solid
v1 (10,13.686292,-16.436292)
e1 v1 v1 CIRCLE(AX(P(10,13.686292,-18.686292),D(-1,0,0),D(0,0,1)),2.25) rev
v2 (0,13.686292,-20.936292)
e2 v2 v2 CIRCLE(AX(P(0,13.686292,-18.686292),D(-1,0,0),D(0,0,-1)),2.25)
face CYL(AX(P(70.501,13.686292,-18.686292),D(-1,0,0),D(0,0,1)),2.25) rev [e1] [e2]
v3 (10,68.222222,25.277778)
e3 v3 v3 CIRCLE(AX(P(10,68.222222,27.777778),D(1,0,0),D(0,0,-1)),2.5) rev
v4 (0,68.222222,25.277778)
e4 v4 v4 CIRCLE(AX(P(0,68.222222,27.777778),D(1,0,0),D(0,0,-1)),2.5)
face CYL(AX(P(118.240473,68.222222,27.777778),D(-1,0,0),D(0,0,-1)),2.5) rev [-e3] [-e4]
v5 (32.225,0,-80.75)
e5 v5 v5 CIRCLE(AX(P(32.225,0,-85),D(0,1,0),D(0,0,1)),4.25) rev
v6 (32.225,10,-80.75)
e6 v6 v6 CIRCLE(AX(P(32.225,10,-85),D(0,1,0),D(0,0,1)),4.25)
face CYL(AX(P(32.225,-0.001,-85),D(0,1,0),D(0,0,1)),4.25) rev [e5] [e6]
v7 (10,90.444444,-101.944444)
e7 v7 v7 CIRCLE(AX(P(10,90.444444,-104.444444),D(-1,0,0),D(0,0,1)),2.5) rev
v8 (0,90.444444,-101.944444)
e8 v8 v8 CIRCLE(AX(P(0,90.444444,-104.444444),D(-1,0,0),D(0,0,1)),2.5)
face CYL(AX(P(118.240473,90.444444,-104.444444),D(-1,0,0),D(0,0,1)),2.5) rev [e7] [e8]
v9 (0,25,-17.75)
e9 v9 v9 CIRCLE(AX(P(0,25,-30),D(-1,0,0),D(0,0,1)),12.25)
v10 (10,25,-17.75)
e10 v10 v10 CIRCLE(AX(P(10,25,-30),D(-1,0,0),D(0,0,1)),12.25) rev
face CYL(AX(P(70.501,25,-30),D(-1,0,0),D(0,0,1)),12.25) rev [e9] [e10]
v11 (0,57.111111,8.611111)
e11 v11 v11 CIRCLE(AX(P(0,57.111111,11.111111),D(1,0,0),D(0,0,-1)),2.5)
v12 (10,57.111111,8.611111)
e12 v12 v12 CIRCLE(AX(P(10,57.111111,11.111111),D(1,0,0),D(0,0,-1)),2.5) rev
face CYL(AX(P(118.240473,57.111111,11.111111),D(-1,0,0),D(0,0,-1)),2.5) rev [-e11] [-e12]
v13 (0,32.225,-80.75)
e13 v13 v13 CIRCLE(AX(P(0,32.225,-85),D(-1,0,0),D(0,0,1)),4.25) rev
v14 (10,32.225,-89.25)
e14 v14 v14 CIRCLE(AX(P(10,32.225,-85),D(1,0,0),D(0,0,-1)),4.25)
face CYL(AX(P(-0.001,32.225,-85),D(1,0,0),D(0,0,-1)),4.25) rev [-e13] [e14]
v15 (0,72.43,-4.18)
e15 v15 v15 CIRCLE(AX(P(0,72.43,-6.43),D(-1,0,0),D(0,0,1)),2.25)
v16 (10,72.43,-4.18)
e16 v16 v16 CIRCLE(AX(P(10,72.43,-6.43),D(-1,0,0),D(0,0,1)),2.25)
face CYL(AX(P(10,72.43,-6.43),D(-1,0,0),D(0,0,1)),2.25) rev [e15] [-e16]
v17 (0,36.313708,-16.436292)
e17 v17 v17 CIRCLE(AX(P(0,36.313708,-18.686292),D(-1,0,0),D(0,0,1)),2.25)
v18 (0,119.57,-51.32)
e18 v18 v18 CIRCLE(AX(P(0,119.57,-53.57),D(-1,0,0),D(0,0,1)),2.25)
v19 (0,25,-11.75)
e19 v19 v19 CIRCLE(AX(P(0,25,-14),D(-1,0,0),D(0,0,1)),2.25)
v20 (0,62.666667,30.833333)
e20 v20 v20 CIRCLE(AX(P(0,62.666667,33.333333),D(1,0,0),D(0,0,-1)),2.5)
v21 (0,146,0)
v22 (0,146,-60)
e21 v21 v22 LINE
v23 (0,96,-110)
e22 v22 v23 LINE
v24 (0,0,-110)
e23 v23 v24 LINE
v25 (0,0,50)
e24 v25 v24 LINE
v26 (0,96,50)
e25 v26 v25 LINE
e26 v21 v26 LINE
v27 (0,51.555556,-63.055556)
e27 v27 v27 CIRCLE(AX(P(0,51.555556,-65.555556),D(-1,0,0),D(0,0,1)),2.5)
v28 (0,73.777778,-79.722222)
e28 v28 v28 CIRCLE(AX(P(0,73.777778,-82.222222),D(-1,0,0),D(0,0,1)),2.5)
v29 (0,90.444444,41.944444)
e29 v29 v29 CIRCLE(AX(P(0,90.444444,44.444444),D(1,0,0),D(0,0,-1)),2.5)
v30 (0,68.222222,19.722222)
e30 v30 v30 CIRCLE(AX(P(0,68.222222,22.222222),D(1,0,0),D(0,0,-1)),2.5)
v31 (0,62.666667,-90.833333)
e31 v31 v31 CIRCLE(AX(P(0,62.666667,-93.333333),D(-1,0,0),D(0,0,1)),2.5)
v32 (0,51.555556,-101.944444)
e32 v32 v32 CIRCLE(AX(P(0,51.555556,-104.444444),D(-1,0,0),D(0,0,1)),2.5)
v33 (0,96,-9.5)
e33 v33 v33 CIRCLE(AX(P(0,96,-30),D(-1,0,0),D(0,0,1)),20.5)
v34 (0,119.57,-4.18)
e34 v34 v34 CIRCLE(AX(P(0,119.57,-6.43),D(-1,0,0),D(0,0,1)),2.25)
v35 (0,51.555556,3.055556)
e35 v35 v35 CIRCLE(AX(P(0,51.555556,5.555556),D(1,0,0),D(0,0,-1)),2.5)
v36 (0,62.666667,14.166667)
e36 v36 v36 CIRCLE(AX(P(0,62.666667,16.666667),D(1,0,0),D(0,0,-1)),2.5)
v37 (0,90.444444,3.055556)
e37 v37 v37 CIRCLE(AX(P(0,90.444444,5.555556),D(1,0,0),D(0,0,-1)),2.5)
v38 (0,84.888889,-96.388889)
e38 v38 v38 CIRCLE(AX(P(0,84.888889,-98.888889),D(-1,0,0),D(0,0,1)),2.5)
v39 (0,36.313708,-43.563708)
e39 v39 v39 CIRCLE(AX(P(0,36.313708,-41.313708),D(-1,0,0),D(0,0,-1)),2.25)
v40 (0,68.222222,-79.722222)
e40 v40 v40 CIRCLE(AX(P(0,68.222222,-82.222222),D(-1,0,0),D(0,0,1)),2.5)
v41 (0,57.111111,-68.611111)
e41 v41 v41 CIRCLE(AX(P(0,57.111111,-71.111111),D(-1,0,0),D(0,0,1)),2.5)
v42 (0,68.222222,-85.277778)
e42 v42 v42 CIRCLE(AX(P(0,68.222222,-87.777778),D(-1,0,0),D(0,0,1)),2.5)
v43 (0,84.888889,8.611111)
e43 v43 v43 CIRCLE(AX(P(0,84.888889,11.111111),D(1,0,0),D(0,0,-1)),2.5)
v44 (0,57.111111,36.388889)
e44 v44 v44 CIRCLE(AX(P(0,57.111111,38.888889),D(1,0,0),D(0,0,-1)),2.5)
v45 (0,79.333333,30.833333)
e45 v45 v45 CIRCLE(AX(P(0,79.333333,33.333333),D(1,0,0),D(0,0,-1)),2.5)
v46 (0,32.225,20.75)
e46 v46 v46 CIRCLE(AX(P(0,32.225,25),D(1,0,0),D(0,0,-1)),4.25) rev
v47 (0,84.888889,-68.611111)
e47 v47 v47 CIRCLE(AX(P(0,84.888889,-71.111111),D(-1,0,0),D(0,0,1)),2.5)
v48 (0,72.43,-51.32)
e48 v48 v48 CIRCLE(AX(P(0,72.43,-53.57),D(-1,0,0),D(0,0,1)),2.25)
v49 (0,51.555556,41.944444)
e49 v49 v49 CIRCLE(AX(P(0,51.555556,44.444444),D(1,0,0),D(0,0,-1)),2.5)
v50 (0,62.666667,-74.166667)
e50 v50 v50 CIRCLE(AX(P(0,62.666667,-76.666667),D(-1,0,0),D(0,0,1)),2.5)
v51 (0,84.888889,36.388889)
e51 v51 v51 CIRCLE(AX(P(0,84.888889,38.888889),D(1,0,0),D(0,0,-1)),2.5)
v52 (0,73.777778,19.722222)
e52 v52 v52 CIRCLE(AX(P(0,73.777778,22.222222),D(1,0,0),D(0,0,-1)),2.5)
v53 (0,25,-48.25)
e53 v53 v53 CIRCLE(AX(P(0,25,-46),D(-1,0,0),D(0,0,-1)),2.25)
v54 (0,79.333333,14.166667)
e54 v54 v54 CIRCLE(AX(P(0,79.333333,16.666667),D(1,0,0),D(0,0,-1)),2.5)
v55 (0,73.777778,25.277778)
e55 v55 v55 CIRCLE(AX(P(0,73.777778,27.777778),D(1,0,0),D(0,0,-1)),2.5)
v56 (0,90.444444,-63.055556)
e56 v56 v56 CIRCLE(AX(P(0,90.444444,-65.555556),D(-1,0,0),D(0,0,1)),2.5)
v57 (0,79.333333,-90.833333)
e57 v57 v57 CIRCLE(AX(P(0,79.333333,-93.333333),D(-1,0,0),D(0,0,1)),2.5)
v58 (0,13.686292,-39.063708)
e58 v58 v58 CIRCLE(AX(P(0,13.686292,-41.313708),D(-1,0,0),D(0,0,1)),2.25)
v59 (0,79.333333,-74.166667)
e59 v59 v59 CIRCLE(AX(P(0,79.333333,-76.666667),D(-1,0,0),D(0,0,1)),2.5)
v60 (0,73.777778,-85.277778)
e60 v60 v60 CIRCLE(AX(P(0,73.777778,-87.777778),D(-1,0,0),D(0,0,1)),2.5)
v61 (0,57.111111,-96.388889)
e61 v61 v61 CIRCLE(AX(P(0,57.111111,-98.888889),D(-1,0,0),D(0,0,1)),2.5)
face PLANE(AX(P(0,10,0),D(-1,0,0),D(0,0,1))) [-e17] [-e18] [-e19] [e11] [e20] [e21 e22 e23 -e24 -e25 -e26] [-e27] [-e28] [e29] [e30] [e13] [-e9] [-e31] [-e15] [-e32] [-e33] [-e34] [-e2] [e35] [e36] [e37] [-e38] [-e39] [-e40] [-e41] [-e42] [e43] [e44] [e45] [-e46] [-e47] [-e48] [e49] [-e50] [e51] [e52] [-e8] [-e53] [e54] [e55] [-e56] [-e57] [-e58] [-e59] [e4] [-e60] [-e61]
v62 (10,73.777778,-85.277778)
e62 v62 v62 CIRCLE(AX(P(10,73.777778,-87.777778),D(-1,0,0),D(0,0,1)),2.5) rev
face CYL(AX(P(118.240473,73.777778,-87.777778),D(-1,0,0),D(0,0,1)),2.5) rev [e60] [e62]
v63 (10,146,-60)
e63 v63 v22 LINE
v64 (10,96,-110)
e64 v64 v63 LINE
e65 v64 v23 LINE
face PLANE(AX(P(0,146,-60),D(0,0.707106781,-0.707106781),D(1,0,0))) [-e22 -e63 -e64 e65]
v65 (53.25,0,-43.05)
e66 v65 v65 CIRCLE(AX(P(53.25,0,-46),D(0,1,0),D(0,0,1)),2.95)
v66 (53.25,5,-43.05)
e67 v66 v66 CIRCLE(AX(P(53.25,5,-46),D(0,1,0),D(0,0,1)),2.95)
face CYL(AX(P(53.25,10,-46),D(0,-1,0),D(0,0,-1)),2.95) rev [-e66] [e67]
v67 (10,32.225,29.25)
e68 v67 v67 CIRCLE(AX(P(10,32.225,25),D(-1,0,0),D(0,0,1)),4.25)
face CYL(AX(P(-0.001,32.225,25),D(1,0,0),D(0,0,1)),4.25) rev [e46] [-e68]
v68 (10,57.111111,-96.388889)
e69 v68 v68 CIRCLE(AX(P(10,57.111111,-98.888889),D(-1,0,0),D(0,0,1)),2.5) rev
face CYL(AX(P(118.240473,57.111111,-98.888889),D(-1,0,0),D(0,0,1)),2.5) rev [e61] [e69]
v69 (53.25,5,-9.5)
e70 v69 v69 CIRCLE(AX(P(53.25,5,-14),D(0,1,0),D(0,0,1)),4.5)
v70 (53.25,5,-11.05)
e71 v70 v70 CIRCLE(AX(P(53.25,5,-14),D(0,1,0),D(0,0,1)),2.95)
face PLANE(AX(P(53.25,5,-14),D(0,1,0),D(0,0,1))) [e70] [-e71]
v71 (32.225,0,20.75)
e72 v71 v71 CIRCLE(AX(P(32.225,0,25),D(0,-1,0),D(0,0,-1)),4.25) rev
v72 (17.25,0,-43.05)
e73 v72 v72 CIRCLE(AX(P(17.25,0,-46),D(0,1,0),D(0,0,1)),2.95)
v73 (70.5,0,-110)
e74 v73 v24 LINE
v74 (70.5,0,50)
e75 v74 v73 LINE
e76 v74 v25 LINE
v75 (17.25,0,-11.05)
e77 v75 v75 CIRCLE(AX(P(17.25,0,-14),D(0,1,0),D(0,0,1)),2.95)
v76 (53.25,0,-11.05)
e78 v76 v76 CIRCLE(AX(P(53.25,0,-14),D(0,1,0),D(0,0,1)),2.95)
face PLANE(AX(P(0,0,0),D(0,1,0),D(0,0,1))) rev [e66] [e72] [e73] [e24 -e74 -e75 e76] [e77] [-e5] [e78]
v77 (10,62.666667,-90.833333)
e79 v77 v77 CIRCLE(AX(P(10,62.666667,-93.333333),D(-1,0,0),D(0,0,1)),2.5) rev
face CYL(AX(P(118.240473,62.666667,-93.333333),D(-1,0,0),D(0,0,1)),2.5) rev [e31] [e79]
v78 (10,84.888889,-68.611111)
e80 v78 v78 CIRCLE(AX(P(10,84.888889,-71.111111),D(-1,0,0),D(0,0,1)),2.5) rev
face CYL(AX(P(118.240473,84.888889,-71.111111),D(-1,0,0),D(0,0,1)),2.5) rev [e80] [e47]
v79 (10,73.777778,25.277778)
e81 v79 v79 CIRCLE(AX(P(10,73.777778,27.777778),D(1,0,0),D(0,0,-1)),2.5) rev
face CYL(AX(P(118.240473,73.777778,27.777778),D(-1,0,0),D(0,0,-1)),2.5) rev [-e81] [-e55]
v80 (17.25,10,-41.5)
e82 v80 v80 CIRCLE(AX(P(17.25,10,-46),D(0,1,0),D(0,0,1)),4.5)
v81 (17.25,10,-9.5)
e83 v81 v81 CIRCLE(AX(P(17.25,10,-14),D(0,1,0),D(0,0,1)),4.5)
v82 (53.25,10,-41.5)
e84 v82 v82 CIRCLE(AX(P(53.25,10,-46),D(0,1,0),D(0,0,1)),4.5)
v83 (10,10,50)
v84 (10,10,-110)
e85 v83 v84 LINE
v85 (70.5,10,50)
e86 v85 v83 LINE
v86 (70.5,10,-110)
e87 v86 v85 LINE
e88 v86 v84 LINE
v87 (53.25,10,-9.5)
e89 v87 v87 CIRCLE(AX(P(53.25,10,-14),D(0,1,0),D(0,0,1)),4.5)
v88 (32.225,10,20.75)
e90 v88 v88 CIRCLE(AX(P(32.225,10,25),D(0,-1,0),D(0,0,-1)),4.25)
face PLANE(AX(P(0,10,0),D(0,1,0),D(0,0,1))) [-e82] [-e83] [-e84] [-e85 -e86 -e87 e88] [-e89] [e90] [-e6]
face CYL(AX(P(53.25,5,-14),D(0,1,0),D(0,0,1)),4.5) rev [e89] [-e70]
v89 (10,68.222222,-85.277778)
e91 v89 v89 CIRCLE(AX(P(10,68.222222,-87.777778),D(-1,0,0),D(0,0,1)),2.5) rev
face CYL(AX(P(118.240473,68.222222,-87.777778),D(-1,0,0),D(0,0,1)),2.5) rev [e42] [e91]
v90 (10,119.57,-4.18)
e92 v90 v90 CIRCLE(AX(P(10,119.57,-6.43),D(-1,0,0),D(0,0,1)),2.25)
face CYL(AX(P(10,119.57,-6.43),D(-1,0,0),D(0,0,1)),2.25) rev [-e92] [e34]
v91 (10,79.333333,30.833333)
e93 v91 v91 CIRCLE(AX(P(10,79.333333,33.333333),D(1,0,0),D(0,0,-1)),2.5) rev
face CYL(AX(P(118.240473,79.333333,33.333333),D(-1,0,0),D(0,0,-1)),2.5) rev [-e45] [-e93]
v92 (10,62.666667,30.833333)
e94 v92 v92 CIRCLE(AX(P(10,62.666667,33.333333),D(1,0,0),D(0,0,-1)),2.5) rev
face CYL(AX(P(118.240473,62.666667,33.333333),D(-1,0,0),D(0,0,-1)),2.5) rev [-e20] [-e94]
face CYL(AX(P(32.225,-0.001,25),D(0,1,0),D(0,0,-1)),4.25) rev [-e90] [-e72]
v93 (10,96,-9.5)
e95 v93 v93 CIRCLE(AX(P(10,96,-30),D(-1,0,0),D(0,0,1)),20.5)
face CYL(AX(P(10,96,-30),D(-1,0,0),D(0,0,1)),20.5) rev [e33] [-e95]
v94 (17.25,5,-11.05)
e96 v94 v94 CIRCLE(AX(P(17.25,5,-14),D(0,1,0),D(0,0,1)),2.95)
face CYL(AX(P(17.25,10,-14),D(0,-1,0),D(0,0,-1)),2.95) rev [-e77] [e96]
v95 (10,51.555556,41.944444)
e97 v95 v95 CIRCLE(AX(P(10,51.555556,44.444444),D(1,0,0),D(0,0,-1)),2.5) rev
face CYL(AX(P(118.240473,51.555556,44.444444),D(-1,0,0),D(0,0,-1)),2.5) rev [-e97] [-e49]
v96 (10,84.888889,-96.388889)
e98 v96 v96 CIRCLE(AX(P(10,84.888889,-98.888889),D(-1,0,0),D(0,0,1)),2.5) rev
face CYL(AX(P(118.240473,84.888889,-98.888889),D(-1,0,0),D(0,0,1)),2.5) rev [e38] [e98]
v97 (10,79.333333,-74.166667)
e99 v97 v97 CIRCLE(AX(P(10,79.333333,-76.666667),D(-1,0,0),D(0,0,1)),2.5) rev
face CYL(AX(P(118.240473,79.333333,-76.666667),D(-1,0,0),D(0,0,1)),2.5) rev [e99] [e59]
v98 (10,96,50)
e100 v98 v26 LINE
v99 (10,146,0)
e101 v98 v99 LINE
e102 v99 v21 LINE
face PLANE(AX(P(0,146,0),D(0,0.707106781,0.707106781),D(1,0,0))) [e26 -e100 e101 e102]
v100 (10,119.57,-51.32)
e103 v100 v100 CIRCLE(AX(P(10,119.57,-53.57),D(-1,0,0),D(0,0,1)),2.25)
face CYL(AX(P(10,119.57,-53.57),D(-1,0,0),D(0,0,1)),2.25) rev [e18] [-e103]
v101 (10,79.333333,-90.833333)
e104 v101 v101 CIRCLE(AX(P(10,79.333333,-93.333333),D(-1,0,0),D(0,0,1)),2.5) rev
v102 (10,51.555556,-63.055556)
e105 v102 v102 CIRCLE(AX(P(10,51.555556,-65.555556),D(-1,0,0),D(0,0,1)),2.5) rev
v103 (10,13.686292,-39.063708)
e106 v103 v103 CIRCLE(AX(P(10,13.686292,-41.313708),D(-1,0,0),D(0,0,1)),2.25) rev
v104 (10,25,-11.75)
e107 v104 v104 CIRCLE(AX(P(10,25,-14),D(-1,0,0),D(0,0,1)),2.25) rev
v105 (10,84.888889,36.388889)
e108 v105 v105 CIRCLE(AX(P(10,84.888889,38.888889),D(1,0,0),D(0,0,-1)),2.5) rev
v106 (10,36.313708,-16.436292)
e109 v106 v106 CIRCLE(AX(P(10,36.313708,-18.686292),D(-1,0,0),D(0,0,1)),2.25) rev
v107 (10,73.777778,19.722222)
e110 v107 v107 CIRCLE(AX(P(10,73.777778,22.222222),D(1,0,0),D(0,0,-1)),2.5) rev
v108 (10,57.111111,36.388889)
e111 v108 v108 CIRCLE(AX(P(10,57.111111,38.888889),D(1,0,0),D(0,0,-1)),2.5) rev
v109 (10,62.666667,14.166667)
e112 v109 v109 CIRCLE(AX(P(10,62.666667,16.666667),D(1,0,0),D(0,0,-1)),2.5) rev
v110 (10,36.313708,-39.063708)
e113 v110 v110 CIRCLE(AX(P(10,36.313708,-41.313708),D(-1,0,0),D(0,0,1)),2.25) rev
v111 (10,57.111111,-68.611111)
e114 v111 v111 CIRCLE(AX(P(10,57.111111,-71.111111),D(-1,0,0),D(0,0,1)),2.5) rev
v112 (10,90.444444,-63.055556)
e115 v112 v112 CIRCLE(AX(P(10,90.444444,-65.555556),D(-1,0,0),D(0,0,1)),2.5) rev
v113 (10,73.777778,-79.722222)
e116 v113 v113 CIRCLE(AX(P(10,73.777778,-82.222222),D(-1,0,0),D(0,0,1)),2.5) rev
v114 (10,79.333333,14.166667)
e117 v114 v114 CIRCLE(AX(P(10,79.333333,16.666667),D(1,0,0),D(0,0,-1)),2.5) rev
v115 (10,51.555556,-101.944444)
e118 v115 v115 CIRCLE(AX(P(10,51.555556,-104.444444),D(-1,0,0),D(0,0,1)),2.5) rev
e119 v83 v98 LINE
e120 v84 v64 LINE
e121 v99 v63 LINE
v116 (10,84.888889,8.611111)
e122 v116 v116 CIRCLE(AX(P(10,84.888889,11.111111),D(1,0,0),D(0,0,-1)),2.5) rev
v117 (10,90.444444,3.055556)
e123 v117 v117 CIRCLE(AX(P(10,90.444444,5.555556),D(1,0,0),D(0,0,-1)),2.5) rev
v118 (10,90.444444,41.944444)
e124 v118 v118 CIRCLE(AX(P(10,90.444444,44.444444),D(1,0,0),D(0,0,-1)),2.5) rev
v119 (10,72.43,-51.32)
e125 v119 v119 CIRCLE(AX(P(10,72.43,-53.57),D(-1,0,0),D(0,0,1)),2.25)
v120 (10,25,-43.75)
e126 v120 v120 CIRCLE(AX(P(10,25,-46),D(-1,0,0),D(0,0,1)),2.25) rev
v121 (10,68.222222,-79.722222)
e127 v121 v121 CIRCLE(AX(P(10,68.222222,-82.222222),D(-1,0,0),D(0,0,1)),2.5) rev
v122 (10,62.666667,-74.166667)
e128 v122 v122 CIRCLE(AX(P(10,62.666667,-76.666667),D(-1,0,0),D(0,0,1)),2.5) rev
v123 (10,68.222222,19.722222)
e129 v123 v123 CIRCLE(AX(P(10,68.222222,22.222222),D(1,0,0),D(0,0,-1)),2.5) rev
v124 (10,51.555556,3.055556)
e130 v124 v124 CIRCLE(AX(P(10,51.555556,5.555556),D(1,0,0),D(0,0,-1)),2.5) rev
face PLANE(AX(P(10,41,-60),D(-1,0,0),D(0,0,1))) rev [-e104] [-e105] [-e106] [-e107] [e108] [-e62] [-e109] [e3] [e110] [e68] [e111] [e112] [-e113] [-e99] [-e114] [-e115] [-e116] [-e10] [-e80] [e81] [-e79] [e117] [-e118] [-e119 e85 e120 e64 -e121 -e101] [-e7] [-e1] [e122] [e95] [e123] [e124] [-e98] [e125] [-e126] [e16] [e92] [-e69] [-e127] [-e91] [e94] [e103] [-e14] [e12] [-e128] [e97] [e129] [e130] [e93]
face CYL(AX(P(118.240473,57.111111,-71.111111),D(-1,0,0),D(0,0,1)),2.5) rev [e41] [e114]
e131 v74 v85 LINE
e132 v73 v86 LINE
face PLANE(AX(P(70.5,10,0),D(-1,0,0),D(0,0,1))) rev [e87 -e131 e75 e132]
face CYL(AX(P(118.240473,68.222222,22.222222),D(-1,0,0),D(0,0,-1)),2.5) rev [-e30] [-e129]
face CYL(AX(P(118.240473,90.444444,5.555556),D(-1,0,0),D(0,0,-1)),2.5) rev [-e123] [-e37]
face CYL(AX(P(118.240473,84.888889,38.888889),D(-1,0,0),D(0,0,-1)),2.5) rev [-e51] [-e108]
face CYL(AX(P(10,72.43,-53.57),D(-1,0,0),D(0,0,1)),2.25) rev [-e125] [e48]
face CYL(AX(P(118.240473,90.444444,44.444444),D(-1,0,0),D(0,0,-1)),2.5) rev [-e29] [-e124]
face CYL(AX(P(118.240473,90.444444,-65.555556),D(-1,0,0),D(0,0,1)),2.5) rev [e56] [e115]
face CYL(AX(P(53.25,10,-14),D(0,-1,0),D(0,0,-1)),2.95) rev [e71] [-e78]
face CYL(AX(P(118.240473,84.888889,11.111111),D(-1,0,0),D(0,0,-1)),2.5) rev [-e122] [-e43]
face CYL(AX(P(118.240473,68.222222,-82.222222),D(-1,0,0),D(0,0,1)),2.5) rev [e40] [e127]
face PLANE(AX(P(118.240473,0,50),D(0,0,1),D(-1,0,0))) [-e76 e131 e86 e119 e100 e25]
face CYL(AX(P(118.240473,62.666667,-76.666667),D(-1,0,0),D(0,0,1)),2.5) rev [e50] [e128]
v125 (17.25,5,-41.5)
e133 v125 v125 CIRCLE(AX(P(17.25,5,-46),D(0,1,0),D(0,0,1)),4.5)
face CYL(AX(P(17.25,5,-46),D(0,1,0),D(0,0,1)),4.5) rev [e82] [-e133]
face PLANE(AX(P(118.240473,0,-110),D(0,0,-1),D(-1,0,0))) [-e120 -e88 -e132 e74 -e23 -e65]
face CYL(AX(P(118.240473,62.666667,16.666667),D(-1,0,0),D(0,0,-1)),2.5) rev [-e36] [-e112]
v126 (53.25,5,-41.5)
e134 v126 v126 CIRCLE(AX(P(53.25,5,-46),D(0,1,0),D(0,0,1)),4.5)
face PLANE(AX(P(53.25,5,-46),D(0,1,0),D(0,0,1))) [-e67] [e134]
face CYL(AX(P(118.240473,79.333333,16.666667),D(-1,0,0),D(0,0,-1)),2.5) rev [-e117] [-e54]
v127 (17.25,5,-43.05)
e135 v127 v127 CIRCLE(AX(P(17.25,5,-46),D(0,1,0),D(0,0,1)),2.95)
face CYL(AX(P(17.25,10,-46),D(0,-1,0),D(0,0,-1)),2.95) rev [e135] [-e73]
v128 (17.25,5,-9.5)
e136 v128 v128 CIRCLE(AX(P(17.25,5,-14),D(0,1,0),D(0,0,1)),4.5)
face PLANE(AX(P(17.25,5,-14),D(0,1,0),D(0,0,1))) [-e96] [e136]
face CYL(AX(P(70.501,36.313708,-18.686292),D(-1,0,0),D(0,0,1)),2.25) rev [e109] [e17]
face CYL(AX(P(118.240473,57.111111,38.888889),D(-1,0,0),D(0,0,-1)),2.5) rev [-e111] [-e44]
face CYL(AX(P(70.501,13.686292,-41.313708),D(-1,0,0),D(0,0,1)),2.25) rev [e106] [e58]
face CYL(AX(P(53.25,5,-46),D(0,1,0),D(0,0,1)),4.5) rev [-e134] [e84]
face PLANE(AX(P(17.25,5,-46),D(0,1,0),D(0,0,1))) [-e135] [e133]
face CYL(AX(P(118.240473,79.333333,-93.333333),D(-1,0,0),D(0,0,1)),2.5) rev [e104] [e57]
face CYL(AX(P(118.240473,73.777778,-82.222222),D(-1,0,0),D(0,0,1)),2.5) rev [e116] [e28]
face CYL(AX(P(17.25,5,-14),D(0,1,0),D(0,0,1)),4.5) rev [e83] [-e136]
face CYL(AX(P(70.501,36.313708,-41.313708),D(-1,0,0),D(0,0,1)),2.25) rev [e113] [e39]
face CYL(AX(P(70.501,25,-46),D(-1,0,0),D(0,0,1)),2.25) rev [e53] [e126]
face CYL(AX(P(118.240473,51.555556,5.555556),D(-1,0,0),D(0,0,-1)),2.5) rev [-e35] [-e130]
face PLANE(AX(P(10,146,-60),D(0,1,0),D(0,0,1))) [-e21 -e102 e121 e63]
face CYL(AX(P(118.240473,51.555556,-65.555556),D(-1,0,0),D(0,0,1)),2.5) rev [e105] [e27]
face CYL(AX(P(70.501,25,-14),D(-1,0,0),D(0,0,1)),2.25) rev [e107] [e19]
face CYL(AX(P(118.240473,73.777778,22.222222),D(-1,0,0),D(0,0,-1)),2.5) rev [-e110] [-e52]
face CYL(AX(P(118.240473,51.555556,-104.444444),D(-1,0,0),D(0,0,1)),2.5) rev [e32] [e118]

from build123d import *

# Parameters (mm, degrees)
SKETCH1_W           = 70.5
SKETCH1_H           = 60
SKETCH1_R           = 2.95
BOSS_EXTRUDE1_DEPTH = 10
SKETCH3_R           = 4.5
CUT_EXTRUDE1_DEPTH  = 5
SKETCH4_W           = 10
SKETCH4_H           = 60
BOSS_EXTRUDE3_DEPTH = 31
CUT_EXTRUDE2_REACH  = 103.248
SKETCH5_R           = 12.25
SKETCH5_R_2         = 2.25
SKETCH6_W           = 60
SKETCH6_H           = 31
SKETCH6_R           = 8
BOSS_EXTRUDE4_DEPTH = 5
SKETCH7_W           = 70.5
SKETCH7_H           = 60
BOSS_EXTRUDE5_DEPTH = 5
SKETCH8_W           = 60
SKETCH8_H           = 100
SKETCH8_R           = 2.25
SKETCH8_R_2         = 20.5
BOSS_EXTRUDE6_DEPTH = 10
CUT_EXTRUDE3_REACH  = 174.876
SKETCH10_W          = 50
SKETCH10_H          = 96
SKETCH10_R          = 2.5
BOSS_EXTRUDE7_DEPTH = 10
CHAMFER1_SIZE       = 50
SKETCH11_W          = 60.5
SKETCH11_H          = 50
BOSS_EXTRUDE8_DEPTH = 10
CUT_EXTRUDE4_REACH  = 194.552
SKETCH12_R          = 4.25
CUT_EXTRUDE6_REACH  = 190.59
SKETCH14_R          = 4.25


with BuildPart() as part:
    # Sketch1 → Boss-Extrude1 (new body)
    with BuildSketch(Plane(origin=(0, 0, 0), x_dir=(1, 0, 0), z_dir=(0, 1, 0))):
        with Locations((35.25, 30)):
            Rectangle(SKETCH1_W, SKETCH1_H)
        with Locations(Location((53.25, 46, 0), (0, 0, 270))):
            Circle(SKETCH1_R, mode=Mode.SUBTRACT)
        with Locations(Location((53.25, 14, 0), (0, 0, 270))):
            Circle(SKETCH1_R, mode=Mode.SUBTRACT)
        with Locations(Location((17.25, 46, 0), (0, 0, 270))):
            Circle(SKETCH1_R, mode=Mode.SUBTRACT)
        with Locations(Location((17.25, 14, 0), (0, 0, 270))):
            Circle(SKETCH1_R, mode=Mode.SUBTRACT)
    extrude(amount=BOSS_EXTRUDE1_DEPTH)

    # Sketch3 → Cut-Extrude1 (cut)
    with BuildSketch(Plane(origin=(0, 10, 0), x_dir=(1, 0, 0), z_dir=(0, 1, 0))):
        with Locations(Location((53.25, 46, 0), (0, 0, 270))):
            Circle(SKETCH3_R)
        with Locations(Location((53.25, 14, 0), (0, 0, 270))):
            Circle(SKETCH3_R)
        with Locations(Location((17.25, 46, 0), (0, 0, 270))):
            Circle(SKETCH3_R)
        with Locations(Location((17.25, 14, 0), (0, 0, 270))):
            Circle(SKETCH3_R)
    extrude(amount=-CUT_EXTRUDE1_DEPTH, mode=Mode.SUBTRACT)

    # Sketch4 → Boss-Extrude3 (add)
    with BuildSketch(Plane(origin=(0, 10, 0), x_dir=(1, 0, 0), z_dir=(0, 1, 0))):
        with Locations((5, 30)):
            Rectangle(SKETCH4_W, SKETCH4_H)
    extrude(amount=BOSS_EXTRUDE3_DEPTH)

    # Sketch5 → Cut-Extrude2 (cut, up to next)
    with BuildSketch(Plane.ZY, mode=Mode.PRIVATE) as cut_extrude2_sk1:
        with Locations((-30, 25)):
            Circle(SKETCH5_R)
    cut_extrude2_tool1 = extrude(cut_extrude2_sk1.sketch, amount=-CUT_EXTRUDE2_REACH, mode=Mode.PRIVATE) & part.part
    # Sketch5 → Cut-Extrude2 (cut, up to next)
    with BuildSketch(Plane.ZY, mode=Mode.PRIVATE) as cut_extrude2_sk2:
        with Locations((-14, 25)):
            Circle(SKETCH5_R_2)
    cut_extrude2_tool2 = extrude(cut_extrude2_sk2.sketch, amount=-CUT_EXTRUDE2_REACH, mode=Mode.PRIVATE) & part.part
    # Sketch5 → Cut-Extrude2 (cut, up to next)
    with BuildSketch(Plane.ZY, mode=Mode.PRIVATE) as cut_extrude2_sk3:
        with Locations((-18.686291501, 36.313708499)):
            Circle(SKETCH5_R_2)
    cut_extrude2_tool3 = extrude(cut_extrude2_sk3.sketch, amount=-CUT_EXTRUDE2_REACH, mode=Mode.PRIVATE) & part.part
    # Sketch5 → Cut-Extrude2 (cut, up to next)
    with BuildSketch(Plane.ZY, mode=Mode.PRIVATE) as cut_extrude2_sk4:
        with Locations((-18.686291501, 13.686291501)):
            Circle(SKETCH5_R_2)
    cut_extrude2_tool4 = extrude(cut_extrude2_sk4.sketch, amount=-CUT_EXTRUDE2_REACH, mode=Mode.PRIVATE) & part.part
    # Sketch5 → Cut-Extrude2 (cut, up to next)
    with BuildSketch(Plane.ZY, mode=Mode.PRIVATE) as cut_extrude2_sk5:
        with Locations((-41.313708499, 36.313708499)):
            Circle(SKETCH5_R_2)
    cut_extrude2_tool5 = extrude(cut_extrude2_sk5.sketch, amount=-CUT_EXTRUDE2_REACH, mode=Mode.PRIVATE) & part.part
    # Sketch5 → Cut-Extrude2 (cut, up to next)
    with BuildSketch(Plane.ZY, mode=Mode.PRIVATE) as cut_extrude2_sk6:
        with Locations((-46, 25)):
            Circle(SKETCH5_R_2)
    cut_extrude2_tool6 = extrude(cut_extrude2_sk6.sketch, amount=-CUT_EXTRUDE2_REACH, mode=Mode.PRIVATE) & part.part
    # Sketch5 → Cut-Extrude2 (cut, up to next)
    with BuildSketch(Plane.ZY, mode=Mode.PRIVATE) as cut_extrude2_sk7:
        with Locations((-41.313708499, 13.686291501)):
            Circle(SKETCH5_R_2)
    cut_extrude2_tool7 = extrude(cut_extrude2_sk7.sketch, amount=-CUT_EXTRUDE2_REACH, mode=Mode.PRIVATE) & part.part
    add(cut_extrude2_tool1.solids().sort_by_distance((0, 25, -30))[0], mode=Mode.SUBTRACT)
    add(cut_extrude2_tool2.solids().sort_by_distance((0, 25, -14))[0], mode=Mode.SUBTRACT)
    add(cut_extrude2_tool3.solids().sort_by_distance((0, 36.313708, -18.686292))[0], mode=Mode.SUBTRACT)
    add(cut_extrude2_tool4.solids().sort_by_distance((0, 13.686292, -18.686292))[0], mode=Mode.SUBTRACT)
    add(cut_extrude2_tool5.solids().sort_by_distance((0, 36.313708, -41.313708))[0], mode=Mode.SUBTRACT)
    add(cut_extrude2_tool6.solids().sort_by_distance((0, 25, -46))[0], mode=Mode.SUBTRACT)
    add(cut_extrude2_tool7.solids().sort_by_distance((0, 13.686292, -41.313708))[0], mode=Mode.SUBTRACT)

    # Sketch6 → Boss-Extrude4 (add)
    with BuildSketch(Plane(origin=(70.5, 0, 0), x_dir=(0, 0, -1), z_dir=(1, 0, 0))):
        with Locations((30, 25.5)):
            Rectangle(SKETCH6_W, SKETCH6_H)
        with Locations((30, 25)):
            Circle(SKETCH6_R, mode=Mode.SUBTRACT)
    extrude(amount=-BOSS_EXTRUDE4_DEPTH)

    # Sketch7 → Boss-Extrude5 (add)
    with BuildSketch(Plane(origin=(0, 41, 0), x_dir=(1, 0, 0), z_dir=(0, 1, 0))):
        with Locations((35.25, 30)):
            Rectangle(SKETCH7_W, SKETCH7_H)
    extrude(amount=BOSS_EXTRUDE5_DEPTH)

    # Sketch8 → Boss-Extrude6 (add)
    with BuildSketch(Plane.ZY):
        with Locations((-30, 96)):
            Rectangle(SKETCH8_W, SKETCH8_H)
        with Locations((-53.57, 72.43)):
            Circle(SKETCH8_R, mode=Mode.SUBTRACT)
        with Locations((-6.43, 72.43)):
            Circle(SKETCH8_R, mode=Mode.SUBTRACT)
        with Locations((-6.43, 119.57)):
            Circle(SKETCH8_R, mode=Mode.SUBTRACT)
        with Locations((-53.57, 119.57)):
            Circle(SKETCH8_R, mode=Mode.SUBTRACT)
        with Locations((-30, 96)):
            Circle(SKETCH8_R_2, mode=Mode.SUBTRACT)
    extrude(amount=-BOSS_EXTRUDE6_DEPTH)

    # Sketch9 → Cut-Extrude3 (cut, up to next)
    with BuildSketch(Plane.XY, mode=Mode.PRIVATE) as cut_extrude3_sk1:
        Polygon((10, 41), (65.5, 41), (65.5, 10), (70.5, 10), (70.5, 46), (10, 46), align=None)
    cut_extrude3_tool1 = extrude(cut_extrude3_sk1.sketch, amount=-CUT_EXTRUDE3_REACH, mode=Mode.PRIVATE) & part.part
    add(cut_extrude3_tool1.solids().sort_by_distance((37.75, 41.704006, 0))[0], mode=Mode.SUBTRACT)

    # Sketch10 → Boss-Extrude7 (add)
    with BuildSketch(Plane.ZY):
        with Locations((-85, 48)):
            Rectangle(SKETCH10_W, SKETCH10_H)
        with Locations((-65.555555556, 90.444444444)):
            Circle(SKETCH10_R, mode=Mode.SUBTRACT)
        with Locations((-104.444444444, 51.555555556)):
            Circle(SKETCH10_R, mode=Mode.SUBTRACT)
        with Locations((-98.888888889, 57.111111111)):
            Circle(SKETCH10_R, mode=Mode.SUBTRACT)
        with Locations((-93.333333333, 62.666666667)):
            Circle(SKETCH10_R, mode=Mode.SUBTRACT)
        with Locations((-87.777777778, 68.222222222)):
            Circle(SKETCH10_R, mode=Mode.SUBTRACT)
        with Locations((-87.777777778, 73.777777778)):
            Circle(SKETCH10_R, mode=Mode.SUBTRACT)
        with Locations((-98.888888889, 84.888888889)):
            Circle(SKETCH10_R, mode=Mode.SUBTRACT)
        with Locations((-104.444444444, 90.444444444)):
            Circle(SKETCH10_R, mode=Mode.SUBTRACT)
        with Locations((-93.333333333, 79.333333333)):
            Circle(SKETCH10_R, mode=Mode.SUBTRACT)
        with Locations((-82.222222222, 68.222222222)):
            Circle(SKETCH10_R, mode=Mode.SUBTRACT)
        with Locations((-82.222222222, 73.777777778)):
            Circle(SKETCH10_R, mode=Mode.SUBTRACT)
        with Locations((-76.666666667, 62.666666667)):
            Circle(SKETCH10_R, mode=Mode.SUBTRACT)
        with Locations((-65.555555556, 51.555555556)):
            Circle(SKETCH10_R, mode=Mode.SUBTRACT)
        with Locations((-71.111111111, 57.111111111)):
            Circle(SKETCH10_R, mode=Mode.SUBTRACT)
        with Locations((-76.666666667, 79.333333333)):
            Circle(SKETCH10_R, mode=Mode.SUBTRACT)
        with Locations((-71.111111111, 84.888888889)):
            Circle(SKETCH10_R, mode=Mode.SUBTRACT)
    extrude(amount=-BOSS_EXTRUDE7_DEPTH)

    # Chamfer1
    chamfer1_edges = [part.edges().sort_by_distance(p)[0] for p in [
        (5, 96, -60),
    ]]
    chamfer(chamfer1_edges, length=CHAMFER1_SIZE - 0.0001)  # a hair under: the kernel refuses the full size

    # Sketch11 → Boss-Extrude8 (add)
    with BuildSketch(Plane(origin=(0, 10, 0), x_dir=(1, 0, 0), z_dir=(0, 1, 0))):
        with Locations((40.25, 85)):
            Rectangle(SKETCH11_W, SKETCH11_H)
    extrude(amount=-BOSS_EXTRUDE8_DEPTH)

    # Sketch12 → Cut-Extrude4 (cut, up to next)
    with BuildSketch(Plane(origin=(10, 0, 0), x_dir=(0, 0, -1), z_dir=(1, 0, 0)), mode=Mode.PRIVATE) as cut_extrude4_sk1:
        with Locations((85, 32.225)):
            Circle(SKETCH12_R)
    cut_extrude4_tool1 = extrude(cut_extrude4_sk1.sketch, amount=-CUT_EXTRUDE4_REACH, mode=Mode.PRIVATE) & part.part
    add(cut_extrude4_tool1.solids().sort_by_distance((10, 32.225, -85))[0], mode=Mode.SUBTRACT)

    # Sketch14 → Cut-Extrude6 (cut, up to next)
    with BuildSketch(Plane(origin=(0, 10, 0), x_dir=(1, 0, 0), z_dir=(0, 1, 0)), mode=Mode.PRIVATE) as cut_extrude6_sk1:
        with Locations(Location((32.225, 85, 0), (0, 0, 270))):
            Circle(SKETCH14_R)
    cut_extrude6_tool1 = extrude(cut_extrude6_sk1.sketch, amount=-CUT_EXTRUDE6_REACH, mode=Mode.PRIVATE) & part.part
    add(cut_extrude6_tool1.solids().sort_by_distance((32.225, 10, -85))[0], mode=Mode.SUBTRACT)

    # Mirror1: part across plane


with BuildPart() as part_1:
    add(part.part)
    add(part.part.mirror(Plane.XY.offset(-30)))


solid = part_1.part
